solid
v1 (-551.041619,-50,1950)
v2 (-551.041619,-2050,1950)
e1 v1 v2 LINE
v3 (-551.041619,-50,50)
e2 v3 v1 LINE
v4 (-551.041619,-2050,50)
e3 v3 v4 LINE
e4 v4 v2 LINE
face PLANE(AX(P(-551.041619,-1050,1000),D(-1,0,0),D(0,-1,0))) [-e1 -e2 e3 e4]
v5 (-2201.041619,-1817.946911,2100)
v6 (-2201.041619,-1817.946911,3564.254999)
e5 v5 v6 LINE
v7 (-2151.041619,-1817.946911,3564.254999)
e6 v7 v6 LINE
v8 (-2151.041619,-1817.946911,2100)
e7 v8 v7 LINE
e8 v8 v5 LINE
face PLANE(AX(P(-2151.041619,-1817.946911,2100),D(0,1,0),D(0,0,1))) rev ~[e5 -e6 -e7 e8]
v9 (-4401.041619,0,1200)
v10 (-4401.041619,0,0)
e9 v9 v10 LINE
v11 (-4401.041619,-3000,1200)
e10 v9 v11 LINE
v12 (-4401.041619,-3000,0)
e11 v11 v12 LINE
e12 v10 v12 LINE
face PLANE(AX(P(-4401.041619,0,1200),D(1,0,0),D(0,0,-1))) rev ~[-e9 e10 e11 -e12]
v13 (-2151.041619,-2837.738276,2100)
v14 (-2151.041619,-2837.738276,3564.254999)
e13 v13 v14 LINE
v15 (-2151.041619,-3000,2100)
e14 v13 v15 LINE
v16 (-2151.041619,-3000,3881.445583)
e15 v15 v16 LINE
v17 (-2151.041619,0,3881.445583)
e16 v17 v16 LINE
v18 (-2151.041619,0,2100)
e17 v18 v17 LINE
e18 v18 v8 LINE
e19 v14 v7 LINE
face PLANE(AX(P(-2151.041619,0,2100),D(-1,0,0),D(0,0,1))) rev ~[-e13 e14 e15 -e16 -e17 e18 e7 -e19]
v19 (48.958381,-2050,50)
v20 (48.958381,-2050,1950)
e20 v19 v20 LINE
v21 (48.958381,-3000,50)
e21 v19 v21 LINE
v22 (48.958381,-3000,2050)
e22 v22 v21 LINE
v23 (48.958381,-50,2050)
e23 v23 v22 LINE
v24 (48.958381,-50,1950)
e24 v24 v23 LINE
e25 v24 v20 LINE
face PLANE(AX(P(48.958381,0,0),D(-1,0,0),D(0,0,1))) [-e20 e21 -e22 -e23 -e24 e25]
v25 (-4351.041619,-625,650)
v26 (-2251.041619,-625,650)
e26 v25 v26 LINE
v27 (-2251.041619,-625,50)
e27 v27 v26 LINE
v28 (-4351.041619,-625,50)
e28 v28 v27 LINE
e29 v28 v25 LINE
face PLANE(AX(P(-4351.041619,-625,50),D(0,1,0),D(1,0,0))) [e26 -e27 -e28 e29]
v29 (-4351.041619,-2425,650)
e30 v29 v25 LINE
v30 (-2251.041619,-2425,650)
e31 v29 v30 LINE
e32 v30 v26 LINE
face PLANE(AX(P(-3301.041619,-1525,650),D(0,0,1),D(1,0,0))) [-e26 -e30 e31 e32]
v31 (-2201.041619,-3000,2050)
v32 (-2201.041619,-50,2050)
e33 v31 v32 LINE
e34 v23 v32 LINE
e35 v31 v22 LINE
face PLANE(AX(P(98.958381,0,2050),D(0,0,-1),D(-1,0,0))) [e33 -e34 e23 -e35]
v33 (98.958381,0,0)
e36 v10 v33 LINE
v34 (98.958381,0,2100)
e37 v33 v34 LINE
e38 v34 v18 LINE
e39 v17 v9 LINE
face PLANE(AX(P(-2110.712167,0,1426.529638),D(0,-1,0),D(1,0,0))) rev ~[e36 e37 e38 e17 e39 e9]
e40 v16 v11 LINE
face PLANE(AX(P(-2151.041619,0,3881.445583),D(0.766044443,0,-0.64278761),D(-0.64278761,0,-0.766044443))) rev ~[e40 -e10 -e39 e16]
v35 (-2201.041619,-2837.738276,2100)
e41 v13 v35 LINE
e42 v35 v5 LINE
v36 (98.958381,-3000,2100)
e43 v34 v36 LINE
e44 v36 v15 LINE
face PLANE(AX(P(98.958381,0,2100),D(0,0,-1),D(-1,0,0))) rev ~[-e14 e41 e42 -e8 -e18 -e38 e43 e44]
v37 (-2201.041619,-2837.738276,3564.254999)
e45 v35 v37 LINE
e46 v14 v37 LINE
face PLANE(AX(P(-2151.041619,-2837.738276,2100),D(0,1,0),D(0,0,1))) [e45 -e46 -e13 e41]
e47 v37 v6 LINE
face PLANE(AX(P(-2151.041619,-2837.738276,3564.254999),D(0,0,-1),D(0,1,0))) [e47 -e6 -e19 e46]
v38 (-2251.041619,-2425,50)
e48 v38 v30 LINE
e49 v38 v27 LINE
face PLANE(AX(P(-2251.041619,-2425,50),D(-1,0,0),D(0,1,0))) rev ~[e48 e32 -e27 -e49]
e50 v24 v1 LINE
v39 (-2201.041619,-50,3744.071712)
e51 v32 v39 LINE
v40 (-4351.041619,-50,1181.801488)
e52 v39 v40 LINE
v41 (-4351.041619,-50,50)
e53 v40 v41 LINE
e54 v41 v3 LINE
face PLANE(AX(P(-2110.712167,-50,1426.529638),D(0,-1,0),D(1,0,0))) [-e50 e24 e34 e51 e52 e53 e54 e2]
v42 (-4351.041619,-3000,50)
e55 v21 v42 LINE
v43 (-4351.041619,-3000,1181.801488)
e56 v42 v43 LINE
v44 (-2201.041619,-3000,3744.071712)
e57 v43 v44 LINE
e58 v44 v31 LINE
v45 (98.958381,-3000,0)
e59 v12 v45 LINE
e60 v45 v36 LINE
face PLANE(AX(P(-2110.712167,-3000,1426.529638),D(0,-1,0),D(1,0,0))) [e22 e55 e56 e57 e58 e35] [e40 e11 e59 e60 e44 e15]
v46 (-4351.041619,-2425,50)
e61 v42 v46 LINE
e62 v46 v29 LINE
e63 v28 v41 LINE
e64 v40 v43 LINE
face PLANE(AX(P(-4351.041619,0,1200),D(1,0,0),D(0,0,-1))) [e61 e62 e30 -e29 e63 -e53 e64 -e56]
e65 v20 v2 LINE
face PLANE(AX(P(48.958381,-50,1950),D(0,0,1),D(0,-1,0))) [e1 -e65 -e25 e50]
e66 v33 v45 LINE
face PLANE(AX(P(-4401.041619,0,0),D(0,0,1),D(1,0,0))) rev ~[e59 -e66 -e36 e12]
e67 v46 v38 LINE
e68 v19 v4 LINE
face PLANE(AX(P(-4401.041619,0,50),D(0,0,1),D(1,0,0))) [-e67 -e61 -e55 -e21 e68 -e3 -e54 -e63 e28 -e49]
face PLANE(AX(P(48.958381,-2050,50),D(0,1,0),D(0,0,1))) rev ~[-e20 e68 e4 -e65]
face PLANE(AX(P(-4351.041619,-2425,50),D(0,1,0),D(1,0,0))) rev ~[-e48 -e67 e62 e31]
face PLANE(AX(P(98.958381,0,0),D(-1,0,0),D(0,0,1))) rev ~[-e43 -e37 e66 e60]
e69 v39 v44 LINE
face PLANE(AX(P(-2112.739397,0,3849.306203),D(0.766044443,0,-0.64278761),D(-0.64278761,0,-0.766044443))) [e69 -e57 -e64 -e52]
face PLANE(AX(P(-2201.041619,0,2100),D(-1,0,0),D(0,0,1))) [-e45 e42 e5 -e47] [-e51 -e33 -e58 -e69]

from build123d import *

# Parameters (mm, degrees)
F1_DEPTH = 3000
F2_T     = -50
F3_W     = 1019.7913646698
F3_H     = 1464.2549991608
F4_DEPTH = 50
F5_W     = 2100
F5_H     = 1800
F6_DEPTH = 600
F7_W     = 2000
F7_H     = 1900
F8_DEPTH = 600


with BuildPart() as f1:
    # F0 (on Front) → F1 (new body)
    with BuildSketch(Plane.XZ):
        Polygon((-4401.0416188458, 0), (98.9583811542, 0), (98.9583811542, 2100), (-2151.0416188458, 2100), (-2151.0416188458, 3881.445583337), (-4401.0416188458, 1200), align=None)
    extrude(amount=F1_DEPTH)

    # F2
    f2_openings = [f1.faces().sort_by_distance(p)[0] for p in [
        (-2149.542304, -3000, 1235.201069),
    ]]
    offset(amount=F2_T, openings=f2_openings, kind=Kind.INTERSECTION)

    # F3 (on face) → F4 (cut, through all)
    with BuildSketch(Plane.YZ.offset(-2151.0416188458)):
        with Locations((-2327.8425931931, 2832.1274995804)):
            Rectangle(F3_W, F3_H)
    extrude(amount=-F4_DEPTH, mode=Mode.SUBTRACT)

    # F5 (on face) → F6 (join)
    with BuildSketch(Plane.XY.offset(50)):
        with Locations((-3301.0416188458, -1525)):
            Rectangle(F5_W, F5_H)
    extrude(amount=F6_DEPTH)

    # F7 (on face) → F8 (join)
    with BuildSketch(Plane(origin=(48.9583811542, 0, 0), x_dir=(0, -1, 0), z_dir=(-1, 0, 0))):
        with Locations((1050, 1000)):
            Rectangle(F7_W, F7_H)
    extrude(amount=F8_DEPTH)


solid = f1.part
